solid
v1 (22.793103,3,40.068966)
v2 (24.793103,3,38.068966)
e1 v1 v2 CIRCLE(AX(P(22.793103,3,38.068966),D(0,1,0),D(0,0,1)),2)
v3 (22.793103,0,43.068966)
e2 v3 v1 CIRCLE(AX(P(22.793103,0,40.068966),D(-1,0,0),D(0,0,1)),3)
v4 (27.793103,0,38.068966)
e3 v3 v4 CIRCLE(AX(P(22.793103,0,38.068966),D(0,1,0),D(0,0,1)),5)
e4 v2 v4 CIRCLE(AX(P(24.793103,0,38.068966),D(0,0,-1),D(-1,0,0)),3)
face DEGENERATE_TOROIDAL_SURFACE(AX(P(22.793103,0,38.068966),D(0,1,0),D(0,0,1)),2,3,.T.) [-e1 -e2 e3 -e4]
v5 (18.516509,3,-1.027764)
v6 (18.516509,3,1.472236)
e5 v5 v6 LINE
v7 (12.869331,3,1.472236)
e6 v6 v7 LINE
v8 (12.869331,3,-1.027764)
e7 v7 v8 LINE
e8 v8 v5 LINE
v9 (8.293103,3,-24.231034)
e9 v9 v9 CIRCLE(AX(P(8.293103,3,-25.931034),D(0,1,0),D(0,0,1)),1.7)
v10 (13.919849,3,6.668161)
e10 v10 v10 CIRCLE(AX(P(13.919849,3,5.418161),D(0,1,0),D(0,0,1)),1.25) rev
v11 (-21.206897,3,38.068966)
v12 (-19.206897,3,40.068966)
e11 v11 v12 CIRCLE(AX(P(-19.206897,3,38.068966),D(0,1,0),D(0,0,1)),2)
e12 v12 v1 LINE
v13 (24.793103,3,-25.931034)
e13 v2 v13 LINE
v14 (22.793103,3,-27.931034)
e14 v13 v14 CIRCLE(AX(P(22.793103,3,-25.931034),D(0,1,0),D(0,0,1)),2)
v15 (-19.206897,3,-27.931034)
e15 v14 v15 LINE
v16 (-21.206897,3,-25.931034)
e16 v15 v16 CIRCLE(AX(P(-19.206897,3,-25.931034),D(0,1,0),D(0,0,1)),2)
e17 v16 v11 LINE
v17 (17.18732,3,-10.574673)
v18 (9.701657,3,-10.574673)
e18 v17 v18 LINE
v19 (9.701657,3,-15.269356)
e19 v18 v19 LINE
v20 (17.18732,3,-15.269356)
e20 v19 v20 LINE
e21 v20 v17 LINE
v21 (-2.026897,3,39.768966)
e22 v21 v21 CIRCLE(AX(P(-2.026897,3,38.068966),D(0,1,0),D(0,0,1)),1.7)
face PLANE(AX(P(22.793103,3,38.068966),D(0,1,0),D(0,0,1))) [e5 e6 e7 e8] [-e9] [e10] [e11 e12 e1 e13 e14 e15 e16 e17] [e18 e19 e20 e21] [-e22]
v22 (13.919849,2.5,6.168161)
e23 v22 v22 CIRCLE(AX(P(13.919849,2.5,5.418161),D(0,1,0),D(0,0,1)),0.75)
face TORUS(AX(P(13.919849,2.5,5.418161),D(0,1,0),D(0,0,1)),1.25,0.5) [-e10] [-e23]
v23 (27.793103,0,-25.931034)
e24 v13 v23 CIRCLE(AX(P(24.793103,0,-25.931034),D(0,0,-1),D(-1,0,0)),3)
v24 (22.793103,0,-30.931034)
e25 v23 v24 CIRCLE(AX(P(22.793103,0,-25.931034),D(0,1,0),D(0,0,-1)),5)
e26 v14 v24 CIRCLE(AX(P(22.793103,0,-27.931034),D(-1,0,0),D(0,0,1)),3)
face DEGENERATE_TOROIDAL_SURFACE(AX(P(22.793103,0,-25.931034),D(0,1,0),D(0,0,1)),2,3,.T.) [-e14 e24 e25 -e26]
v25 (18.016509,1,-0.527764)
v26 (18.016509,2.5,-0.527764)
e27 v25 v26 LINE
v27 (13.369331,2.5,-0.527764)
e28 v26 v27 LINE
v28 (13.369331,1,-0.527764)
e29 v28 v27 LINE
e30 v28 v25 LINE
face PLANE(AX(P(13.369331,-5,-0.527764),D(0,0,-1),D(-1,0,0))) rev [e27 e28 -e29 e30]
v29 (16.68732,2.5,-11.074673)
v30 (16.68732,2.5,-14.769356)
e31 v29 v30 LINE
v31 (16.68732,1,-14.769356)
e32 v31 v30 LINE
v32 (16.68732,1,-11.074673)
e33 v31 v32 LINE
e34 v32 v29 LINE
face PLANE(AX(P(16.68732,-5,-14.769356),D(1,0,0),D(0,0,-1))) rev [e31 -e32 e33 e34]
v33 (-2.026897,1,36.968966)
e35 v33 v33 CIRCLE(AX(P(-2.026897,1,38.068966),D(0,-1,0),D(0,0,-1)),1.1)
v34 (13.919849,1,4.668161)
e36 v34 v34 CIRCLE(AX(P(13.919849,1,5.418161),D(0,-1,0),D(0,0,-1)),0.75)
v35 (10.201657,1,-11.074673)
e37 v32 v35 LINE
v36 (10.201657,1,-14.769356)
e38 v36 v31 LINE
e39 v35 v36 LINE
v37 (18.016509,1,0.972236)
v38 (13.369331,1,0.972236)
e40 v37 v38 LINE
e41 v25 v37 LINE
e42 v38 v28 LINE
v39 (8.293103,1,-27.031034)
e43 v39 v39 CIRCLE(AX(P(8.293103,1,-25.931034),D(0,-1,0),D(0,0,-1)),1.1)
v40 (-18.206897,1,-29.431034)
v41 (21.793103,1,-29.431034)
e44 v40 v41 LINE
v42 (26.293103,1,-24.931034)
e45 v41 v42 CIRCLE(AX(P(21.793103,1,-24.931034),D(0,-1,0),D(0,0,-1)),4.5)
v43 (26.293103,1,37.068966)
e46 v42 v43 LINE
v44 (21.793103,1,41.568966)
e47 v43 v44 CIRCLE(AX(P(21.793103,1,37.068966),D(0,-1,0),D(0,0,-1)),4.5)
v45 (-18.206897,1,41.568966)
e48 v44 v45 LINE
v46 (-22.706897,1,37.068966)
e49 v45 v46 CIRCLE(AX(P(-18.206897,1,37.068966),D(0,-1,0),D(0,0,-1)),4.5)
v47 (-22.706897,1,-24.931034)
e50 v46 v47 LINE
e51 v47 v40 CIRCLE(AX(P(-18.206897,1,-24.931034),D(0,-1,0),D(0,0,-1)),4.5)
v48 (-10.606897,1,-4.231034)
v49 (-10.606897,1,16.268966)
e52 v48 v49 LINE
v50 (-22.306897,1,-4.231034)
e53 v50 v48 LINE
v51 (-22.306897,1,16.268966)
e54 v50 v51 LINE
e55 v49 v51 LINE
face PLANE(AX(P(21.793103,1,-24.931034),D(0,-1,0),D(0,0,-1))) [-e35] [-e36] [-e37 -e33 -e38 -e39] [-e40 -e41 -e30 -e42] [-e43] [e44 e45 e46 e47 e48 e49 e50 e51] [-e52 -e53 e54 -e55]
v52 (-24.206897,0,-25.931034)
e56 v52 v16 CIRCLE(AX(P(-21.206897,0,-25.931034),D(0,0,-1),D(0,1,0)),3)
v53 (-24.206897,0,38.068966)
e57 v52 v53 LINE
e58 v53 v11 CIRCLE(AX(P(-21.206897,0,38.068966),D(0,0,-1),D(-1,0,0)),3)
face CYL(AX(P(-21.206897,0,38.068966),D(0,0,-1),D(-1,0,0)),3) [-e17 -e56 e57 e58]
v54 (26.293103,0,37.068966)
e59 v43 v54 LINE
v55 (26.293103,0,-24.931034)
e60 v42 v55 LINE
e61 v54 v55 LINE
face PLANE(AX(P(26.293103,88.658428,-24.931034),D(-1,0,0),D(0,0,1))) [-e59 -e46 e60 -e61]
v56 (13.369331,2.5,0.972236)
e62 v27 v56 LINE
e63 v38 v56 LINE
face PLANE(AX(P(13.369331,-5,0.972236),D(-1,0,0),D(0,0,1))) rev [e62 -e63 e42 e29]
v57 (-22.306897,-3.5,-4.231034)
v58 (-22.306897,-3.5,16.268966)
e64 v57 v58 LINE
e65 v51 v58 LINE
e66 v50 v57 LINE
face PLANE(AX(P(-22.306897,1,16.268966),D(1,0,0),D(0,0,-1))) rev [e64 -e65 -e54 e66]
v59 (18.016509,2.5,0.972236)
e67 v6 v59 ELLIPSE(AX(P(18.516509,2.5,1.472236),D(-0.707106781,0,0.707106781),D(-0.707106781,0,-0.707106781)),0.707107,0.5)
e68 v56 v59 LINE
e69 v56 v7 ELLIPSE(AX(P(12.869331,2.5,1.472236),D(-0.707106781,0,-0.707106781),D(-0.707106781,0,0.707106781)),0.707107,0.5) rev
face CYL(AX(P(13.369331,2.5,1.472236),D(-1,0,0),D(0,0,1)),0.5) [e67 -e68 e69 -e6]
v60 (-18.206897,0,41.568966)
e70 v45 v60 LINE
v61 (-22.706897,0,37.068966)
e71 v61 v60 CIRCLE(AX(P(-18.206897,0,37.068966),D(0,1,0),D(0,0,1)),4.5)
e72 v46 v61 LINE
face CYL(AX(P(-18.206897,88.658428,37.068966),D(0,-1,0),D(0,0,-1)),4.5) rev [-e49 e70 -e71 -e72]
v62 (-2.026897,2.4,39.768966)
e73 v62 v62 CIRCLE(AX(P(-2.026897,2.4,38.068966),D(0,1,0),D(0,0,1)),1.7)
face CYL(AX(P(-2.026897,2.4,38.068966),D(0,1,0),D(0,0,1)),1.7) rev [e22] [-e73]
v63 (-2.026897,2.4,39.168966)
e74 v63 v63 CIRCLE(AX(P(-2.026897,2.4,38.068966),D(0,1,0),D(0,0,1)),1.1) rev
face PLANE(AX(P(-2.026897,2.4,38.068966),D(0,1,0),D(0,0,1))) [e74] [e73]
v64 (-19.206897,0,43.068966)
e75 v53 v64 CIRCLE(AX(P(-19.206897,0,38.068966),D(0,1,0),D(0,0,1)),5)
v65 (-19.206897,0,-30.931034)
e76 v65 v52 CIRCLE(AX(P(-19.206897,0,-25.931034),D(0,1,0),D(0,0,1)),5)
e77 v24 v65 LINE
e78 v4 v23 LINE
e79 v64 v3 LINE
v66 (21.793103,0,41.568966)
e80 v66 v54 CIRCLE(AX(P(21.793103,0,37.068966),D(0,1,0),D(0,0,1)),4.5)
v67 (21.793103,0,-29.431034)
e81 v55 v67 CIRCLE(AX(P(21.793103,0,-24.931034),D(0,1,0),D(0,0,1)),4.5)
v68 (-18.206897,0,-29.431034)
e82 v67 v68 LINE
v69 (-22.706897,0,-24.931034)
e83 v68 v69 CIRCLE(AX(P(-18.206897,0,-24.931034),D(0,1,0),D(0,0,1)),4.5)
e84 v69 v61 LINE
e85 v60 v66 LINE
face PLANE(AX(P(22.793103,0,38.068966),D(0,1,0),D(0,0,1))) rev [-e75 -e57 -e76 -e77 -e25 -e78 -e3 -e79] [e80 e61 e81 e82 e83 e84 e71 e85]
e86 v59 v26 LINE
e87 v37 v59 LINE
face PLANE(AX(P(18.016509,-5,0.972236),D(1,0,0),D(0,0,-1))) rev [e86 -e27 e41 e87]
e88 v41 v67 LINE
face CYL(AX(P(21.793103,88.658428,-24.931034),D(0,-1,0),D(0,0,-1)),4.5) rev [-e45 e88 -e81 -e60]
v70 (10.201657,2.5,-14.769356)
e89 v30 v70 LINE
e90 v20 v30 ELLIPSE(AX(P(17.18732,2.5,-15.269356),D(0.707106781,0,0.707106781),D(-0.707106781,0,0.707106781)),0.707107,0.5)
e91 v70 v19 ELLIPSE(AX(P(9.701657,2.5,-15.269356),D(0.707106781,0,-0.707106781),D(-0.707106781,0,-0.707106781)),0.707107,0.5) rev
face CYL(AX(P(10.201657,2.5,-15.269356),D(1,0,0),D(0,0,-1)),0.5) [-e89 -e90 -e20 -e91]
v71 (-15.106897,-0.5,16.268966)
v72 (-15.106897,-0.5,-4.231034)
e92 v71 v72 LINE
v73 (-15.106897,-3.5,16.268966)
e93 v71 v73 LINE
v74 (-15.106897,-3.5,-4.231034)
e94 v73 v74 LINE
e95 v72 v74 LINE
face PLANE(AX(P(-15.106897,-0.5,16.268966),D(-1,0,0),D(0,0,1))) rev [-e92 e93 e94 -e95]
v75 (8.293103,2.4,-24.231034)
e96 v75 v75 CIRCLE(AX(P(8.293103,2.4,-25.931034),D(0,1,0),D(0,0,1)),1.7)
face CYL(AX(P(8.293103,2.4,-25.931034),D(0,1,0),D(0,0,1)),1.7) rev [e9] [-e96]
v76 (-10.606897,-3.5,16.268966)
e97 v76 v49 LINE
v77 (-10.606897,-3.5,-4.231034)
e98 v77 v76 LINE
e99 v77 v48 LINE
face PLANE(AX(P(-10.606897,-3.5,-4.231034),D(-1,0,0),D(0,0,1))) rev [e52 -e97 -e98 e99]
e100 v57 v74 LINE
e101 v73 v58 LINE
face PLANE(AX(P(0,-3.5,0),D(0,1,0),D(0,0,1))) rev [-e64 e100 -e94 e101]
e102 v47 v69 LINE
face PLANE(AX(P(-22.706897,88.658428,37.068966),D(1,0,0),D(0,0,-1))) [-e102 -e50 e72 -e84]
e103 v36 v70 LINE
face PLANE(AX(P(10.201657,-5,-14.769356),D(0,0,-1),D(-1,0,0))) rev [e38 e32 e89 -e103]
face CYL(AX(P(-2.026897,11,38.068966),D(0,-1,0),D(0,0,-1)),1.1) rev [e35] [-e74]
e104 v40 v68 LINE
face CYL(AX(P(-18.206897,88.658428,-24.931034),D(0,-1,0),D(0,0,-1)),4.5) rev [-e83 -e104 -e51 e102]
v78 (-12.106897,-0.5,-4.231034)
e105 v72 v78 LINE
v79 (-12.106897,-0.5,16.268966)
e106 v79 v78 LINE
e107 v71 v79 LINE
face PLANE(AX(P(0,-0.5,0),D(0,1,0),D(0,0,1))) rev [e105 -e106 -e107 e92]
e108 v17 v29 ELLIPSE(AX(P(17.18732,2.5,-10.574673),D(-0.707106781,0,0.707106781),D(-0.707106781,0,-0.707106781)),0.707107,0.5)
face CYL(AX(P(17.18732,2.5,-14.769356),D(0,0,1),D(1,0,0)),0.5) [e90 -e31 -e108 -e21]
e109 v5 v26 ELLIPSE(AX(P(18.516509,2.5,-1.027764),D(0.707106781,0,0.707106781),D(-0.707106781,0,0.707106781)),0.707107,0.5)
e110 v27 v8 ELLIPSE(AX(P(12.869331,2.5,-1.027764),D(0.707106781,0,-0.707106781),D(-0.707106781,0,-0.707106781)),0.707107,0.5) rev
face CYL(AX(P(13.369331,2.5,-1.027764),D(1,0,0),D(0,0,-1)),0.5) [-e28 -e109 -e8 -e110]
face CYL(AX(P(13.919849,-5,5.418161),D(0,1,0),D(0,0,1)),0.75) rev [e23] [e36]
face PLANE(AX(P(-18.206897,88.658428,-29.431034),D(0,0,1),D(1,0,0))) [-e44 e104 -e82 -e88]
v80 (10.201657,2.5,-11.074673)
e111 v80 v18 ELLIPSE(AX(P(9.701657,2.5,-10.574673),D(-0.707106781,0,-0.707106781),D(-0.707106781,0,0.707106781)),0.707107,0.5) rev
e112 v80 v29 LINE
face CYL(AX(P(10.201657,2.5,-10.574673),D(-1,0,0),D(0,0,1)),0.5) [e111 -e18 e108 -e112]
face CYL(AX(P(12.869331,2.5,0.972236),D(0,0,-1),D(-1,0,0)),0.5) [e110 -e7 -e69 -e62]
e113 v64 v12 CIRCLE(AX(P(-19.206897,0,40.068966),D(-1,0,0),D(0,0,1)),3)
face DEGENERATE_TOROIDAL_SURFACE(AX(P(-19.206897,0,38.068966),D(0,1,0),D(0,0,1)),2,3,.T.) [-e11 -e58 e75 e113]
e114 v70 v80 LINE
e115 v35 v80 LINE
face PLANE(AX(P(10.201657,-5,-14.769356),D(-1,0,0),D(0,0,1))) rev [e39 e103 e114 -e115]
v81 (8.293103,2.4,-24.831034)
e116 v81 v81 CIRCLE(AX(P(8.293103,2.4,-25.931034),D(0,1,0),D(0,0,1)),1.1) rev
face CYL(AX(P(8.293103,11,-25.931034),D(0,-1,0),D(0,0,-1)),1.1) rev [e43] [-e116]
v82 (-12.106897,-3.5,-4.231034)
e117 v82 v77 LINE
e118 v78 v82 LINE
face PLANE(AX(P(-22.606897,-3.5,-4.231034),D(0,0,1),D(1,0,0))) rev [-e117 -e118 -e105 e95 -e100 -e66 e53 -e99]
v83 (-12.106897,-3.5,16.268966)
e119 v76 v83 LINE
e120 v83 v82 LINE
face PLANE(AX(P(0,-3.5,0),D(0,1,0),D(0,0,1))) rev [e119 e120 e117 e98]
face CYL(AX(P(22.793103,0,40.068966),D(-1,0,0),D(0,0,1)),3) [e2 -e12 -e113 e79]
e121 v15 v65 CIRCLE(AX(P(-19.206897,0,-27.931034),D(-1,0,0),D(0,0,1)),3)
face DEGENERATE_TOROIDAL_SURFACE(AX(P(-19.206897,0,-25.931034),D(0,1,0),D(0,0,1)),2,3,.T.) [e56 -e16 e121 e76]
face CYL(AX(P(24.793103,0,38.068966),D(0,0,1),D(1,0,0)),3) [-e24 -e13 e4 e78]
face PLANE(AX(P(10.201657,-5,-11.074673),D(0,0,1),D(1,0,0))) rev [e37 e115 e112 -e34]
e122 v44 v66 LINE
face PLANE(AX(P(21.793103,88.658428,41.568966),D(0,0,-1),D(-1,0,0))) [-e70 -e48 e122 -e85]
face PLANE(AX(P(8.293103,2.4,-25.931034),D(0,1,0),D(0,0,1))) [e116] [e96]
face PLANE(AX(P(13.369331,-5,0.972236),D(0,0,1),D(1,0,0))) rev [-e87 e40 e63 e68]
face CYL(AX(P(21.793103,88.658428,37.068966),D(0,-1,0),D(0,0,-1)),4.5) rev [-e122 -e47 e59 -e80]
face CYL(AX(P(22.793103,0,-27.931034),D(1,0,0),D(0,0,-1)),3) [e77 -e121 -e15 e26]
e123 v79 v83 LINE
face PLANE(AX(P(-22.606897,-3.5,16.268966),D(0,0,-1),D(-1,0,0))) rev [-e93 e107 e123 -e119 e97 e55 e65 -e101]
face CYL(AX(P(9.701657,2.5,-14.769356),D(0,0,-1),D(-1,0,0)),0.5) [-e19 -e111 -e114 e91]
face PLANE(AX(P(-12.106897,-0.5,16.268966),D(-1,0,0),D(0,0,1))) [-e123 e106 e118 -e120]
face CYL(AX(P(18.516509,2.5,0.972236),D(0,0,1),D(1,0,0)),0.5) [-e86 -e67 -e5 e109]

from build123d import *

# Parameters (mm, degrees)
BOSS_EXTRUDE1_DEPTH = 3
CUT_EXTRUDE1_DEPTH  = 1
FILLET1_R           = 3
SKETCH6_W           = 12
SKETCH6_H           = 20.5
BOSS_EXTRUDE3_DEPTH = 4.5
SKETCH28_W          = 0.3
SKETCH28_H          = 20.5
CUT_EXTRUDE18_DEPTH = 4.5
SKETCH44_R          = 1.1
CUT_EXTRUDE26_DEPTH = 10
SKETCH45_R          = 1.1
CUT_EXTRUDE27_DEPTH = 10
SKETCH47_R          = 1.7
CUT_EXTRUDE29_DEPTH = 0.6
SKETCH13_W          = 3
SKETCH13_H          = 20.5
CUT_EXTRUDE30_DEPTH = 3
SKETCH49_W          = 6.485663297
SKETCH49_H          = 3.694682329
CUT_EXTRUDE31_DEPTH = 8
SKETCH48_R          = 0.75
SKETCH48_W          = 4.647178446
SKETCH48_H          = 1.5
CUT_EXTRUDE33_DEPTH = 8
FILLET2_R           = 0.5
BOSS_EXTRUDE4_DEPTH = 1


with BuildPart() as part:
    # Sketch1 → Boss-Extrude1 (new body)
    with BuildSketch(Plane(origin=(0, 0, 0), x_dir=(1, 0, 0), z_dir=(0, 1, 0))):
        with BuildLine():
            Line((-19.206896552, 30.931034483), (22.793103448, 30.931034483))
            ThreePointArc((22.793103448, 30.931034483), (26.328637354, 29.466568389), (27.793103448, 25.931034483))
            Line((27.793103448, 25.931034483), (27.793103448, -38.068965517))
            ThreePointArc((27.793103448, -38.068965517), (26.328637354, -41.604499423), (22.793103448, -43.068965517))
            Line((22.793103448, -43.068965517), (-19.206896552, -43.068965517))
            ThreePointArc((-19.206896552, -43.068965517), (-22.742430458, -41.604499423), (-24.206896552, -38.068965517))
            Line((-24.206896552, -38.068965517), (-24.206896552, 25.931034483))
            ThreePointArc((-24.206896552, 25.931034483), (-22.742430458, 29.466568389), (-19.206896552, 30.931034483))
        make_face()
    extrude(amount=BOSS_EXTRUDE1_DEPTH)

    # Sketch3 → Cut-Extrude1 (cut)
    with BuildSketch(Plane(origin=(0, 0, 0), x_dir=(-1, 0, 0), z_dir=(0, -1, 0))):
        with BuildLine():
            Line((18.206896552, 29.931034483), (-21.793103448, 29.931034483))
            ThreePointArc((-21.793103448, 29.931034483), (-25.328637354, 28.466568389), (-26.793103448, 24.931034483))
            Line((-26.793103448, 24.931034483), (-26.793103448, -37.068965517))
            ThreePointArc((-26.793103448, -37.068965517), (-25.328637354, -40.604499423), (-21.793103448, -42.068965517))
            Line((-21.793103448, -42.068965517), (18.206896552, -42.068965517))
            ThreePointArc((18.206896552, -42.068965517), (21.742430458, -40.604499423), (23.206896552, -37.068965517))
            Line((23.206896552, -37.068965517), (23.206896552, 24.931034483))
            ThreePointArc((23.206896552, 24.931034483), (21.742430458, 28.466568389), (18.206896552, 29.931034483))
        make_face()
    extrude(amount=-CUT_EXTRUDE1_DEPTH, mode=Mode.SUBTRACT)

    # Fillet1
    fillet1_edges = [part.edges().sort_by_distance(p)[0] for p in [
        (-22.742430458, 3, -29.466568389),
        (1.793103448, 3, -30.931034483),
        (26.328637354, 3, -29.466568389),
        (27.793103448, 3, 6.068965517),
        (26.328637354, 3, 41.604499423),
        (1.793103448, 3, 43.068965517),
        (-22.742430458, 3, 41.604499423),
        (-24.206896552, 3, 6.068965517),
    ]]
    fillet(fillet1_edges, radius=FILLET1_R - 0.0001)  # a hair under: the kernel refuses the full size

    # Sketch6 → Boss-Extrude3 (add)
    with BuildSketch(Plane.XZ.offset(-1)):
        with Locations((-16.606896552, 6.018965517)):
            Rectangle(SKETCH6_W, SKETCH6_H)
    extrude(amount=BOSS_EXTRUDE3_DEPTH)

    # Sketch28 → Cut-Extrude18 (cut)
    with BuildSketch(Plane.XZ.offset(3.5)):
        with Locations((-22.456896552, 6.018965517)):
            Rectangle(SKETCH28_W, SKETCH28_H)
    extrude(amount=-CUT_EXTRUDE18_DEPTH, mode=Mode.SUBTRACT)

    # Sketch44 → Cut-Extrude26 (cut)
    with BuildSketch(Plane.XZ.offset(-1)):
        with Locations(Location((-2.026896552, 38.068965517, 0), (0, 0, 270))):
            Circle(SKETCH44_R)
    extrude(amount=-CUT_EXTRUDE26_DEPTH, mode=Mode.SUBTRACT)

    # Sketch45 → Cut-Extrude27 (cut)
    with BuildSketch(Plane.XZ.offset(-1)):
        with Locations(Location((8.293103448, -25.931034483, 0), (0, 0, 270))):
            Circle(SKETCH45_R)
    extrude(amount=-CUT_EXTRUDE27_DEPTH, mode=Mode.SUBTRACT)

    # Sketch47 → Cut-Extrude29 (cut)
    with BuildSketch(Plane(origin=(0, 3, 0), x_dir=(1, 0, 0), z_dir=(0, 1, 0))):
        with Locations(Location((8.293103448, 25.931034483, 0), (0, 0, 270))):
            Circle(SKETCH47_R)
        with Locations(Location((-2.026896552, -38.068965517, 0), (0, 0, 270))):
            Circle(SKETCH47_R)
    extrude(amount=-CUT_EXTRUDE29_DEPTH, mode=Mode.SUBTRACT)

    # Sketch13 → Cut-Extrude30 (cut)
    with BuildSketch(Plane.XZ.offset(3.5)):
        with Locations((-13.606896552, 6.018965517)):
            Rectangle(SKETCH13_W, SKETCH13_H)
    extrude(amount=-CUT_EXTRUDE30_DEPTH, mode=Mode.SUBTRACT)

    # Sketch49 → Cut-Extrude31 (cut)
    with BuildSketch(Plane(origin=(0, 3, 0), x_dir=(1, 0, 0), z_dir=(0, 1, 0))):
        with Locations((13.444488672, 12.922014382)):
            Rectangle(SKETCH49_W, SKETCH49_H)
    extrude(amount=-CUT_EXTRUDE31_DEPTH, mode=Mode.SUBTRACT)

    # Sketch48 → Cut-Extrude33 (cut)
    with BuildSketch(Plane(origin=(0, 3, 0), x_dir=(1, 0, 0), z_dir=(0, 1, 0))):
        with Locations(Location((13.919849349, -5.418160984, 0), (0, 0, 270))):
            Circle(SKETCH48_R)
        with Locations((15.692920165, -0.222236134)):
            Rectangle(SKETCH48_W, SKETCH48_H)
    extrude(amount=-CUT_EXTRUDE33_DEPTH, mode=Mode.SUBTRACT)

    # Fillet2
    fillet2_edges = [part.edges().sort_by_distance(p)[0] for p in [
        (10.201657023, 3, -12.922014382),
        (13.444488671, 3, -11.074673217),
        (16.68732032, 3, -12.922014382),
        (13.444488671, 3, -14.769355546),
        (13.369330942, 3, 0.222236134),
        (15.692920165, 3, 0.972236134),
        (18.016509388, 3, 0.222236134),
        (15.692920165, 3, -0.527763866),
        (13.919849349, 3, 4.668160984),
    ]]
    fillet(fillet2_edges, radius=FILLET2_R)

    # Sketch51 → Boss-Extrude4 (add)
    with BuildSketch(Plane(origin=(0, 0, 0), x_dir=(1, 0, 0), z_dir=(0, 1, 0))):
        with BuildLine():
            Line((26.793103448, 24.931034483), (26.793103448, -37.068965517))
            ThreePointArc((26.793103448, -37.068965517), (25.328637354, -40.604499423), (21.793103448, -42.068965517))
            Line((21.793103448, -42.068965517), (-18.206896552, -42.068965517))
            ThreePointArc((-18.206896552, -42.068965517), (-21.742430458, -40.604499423), (-23.206896552, -37.068965517))
            Line((-23.206896552, -37.068965517), (-23.206896552, 24.931034483))
            ThreePointArc((-23.206896552, 24.931034483), (-21.742430458, 28.466568389), (-18.206896552, 29.931034483))
            Line((-18.206896552, 29.931034483), (21.793103448, 29.931034483))
            ThreePointArc((21.793103448, 29.931034483), (25.328637354, 28.466568389), (26.793103448, 24.931034483))
        make_face()
        with BuildLine():
            Line((21.793103448, -41.568965517), (-18.206896552, -41.568965517))
            ThreePointArc((-18.206896552, -41.568965517), (-21.388877067, -40.250946033), (-22.706896552, -37.068965517))
            Line((-22.706896552, -37.068965517), (-22.706896552, 24.931034483))
            ThreePointArc((-22.706896552, 24.931034483), (-21.388877067, 28.113014998), (-18.206896552, 29.431034483))
            Line((-18.206896552, 29.431034483), (21.793103448, 29.431034483))
            ThreePointArc((21.793103448, 29.431034483), (24.975083964, 28.113014998), (26.293103448, 24.931034483))
            Line((26.293103448, 24.931034483), (26.293103448, -37.068965517))
            ThreePointArc((26.293103448, -37.068965517), (24.975083964, -40.250946033), (21.793103448, -41.568965517))
        make_face(mode=Mode.SUBTRACT)
    extrude(amount=BOSS_EXTRUDE4_DEPTH)


solid = part.part
